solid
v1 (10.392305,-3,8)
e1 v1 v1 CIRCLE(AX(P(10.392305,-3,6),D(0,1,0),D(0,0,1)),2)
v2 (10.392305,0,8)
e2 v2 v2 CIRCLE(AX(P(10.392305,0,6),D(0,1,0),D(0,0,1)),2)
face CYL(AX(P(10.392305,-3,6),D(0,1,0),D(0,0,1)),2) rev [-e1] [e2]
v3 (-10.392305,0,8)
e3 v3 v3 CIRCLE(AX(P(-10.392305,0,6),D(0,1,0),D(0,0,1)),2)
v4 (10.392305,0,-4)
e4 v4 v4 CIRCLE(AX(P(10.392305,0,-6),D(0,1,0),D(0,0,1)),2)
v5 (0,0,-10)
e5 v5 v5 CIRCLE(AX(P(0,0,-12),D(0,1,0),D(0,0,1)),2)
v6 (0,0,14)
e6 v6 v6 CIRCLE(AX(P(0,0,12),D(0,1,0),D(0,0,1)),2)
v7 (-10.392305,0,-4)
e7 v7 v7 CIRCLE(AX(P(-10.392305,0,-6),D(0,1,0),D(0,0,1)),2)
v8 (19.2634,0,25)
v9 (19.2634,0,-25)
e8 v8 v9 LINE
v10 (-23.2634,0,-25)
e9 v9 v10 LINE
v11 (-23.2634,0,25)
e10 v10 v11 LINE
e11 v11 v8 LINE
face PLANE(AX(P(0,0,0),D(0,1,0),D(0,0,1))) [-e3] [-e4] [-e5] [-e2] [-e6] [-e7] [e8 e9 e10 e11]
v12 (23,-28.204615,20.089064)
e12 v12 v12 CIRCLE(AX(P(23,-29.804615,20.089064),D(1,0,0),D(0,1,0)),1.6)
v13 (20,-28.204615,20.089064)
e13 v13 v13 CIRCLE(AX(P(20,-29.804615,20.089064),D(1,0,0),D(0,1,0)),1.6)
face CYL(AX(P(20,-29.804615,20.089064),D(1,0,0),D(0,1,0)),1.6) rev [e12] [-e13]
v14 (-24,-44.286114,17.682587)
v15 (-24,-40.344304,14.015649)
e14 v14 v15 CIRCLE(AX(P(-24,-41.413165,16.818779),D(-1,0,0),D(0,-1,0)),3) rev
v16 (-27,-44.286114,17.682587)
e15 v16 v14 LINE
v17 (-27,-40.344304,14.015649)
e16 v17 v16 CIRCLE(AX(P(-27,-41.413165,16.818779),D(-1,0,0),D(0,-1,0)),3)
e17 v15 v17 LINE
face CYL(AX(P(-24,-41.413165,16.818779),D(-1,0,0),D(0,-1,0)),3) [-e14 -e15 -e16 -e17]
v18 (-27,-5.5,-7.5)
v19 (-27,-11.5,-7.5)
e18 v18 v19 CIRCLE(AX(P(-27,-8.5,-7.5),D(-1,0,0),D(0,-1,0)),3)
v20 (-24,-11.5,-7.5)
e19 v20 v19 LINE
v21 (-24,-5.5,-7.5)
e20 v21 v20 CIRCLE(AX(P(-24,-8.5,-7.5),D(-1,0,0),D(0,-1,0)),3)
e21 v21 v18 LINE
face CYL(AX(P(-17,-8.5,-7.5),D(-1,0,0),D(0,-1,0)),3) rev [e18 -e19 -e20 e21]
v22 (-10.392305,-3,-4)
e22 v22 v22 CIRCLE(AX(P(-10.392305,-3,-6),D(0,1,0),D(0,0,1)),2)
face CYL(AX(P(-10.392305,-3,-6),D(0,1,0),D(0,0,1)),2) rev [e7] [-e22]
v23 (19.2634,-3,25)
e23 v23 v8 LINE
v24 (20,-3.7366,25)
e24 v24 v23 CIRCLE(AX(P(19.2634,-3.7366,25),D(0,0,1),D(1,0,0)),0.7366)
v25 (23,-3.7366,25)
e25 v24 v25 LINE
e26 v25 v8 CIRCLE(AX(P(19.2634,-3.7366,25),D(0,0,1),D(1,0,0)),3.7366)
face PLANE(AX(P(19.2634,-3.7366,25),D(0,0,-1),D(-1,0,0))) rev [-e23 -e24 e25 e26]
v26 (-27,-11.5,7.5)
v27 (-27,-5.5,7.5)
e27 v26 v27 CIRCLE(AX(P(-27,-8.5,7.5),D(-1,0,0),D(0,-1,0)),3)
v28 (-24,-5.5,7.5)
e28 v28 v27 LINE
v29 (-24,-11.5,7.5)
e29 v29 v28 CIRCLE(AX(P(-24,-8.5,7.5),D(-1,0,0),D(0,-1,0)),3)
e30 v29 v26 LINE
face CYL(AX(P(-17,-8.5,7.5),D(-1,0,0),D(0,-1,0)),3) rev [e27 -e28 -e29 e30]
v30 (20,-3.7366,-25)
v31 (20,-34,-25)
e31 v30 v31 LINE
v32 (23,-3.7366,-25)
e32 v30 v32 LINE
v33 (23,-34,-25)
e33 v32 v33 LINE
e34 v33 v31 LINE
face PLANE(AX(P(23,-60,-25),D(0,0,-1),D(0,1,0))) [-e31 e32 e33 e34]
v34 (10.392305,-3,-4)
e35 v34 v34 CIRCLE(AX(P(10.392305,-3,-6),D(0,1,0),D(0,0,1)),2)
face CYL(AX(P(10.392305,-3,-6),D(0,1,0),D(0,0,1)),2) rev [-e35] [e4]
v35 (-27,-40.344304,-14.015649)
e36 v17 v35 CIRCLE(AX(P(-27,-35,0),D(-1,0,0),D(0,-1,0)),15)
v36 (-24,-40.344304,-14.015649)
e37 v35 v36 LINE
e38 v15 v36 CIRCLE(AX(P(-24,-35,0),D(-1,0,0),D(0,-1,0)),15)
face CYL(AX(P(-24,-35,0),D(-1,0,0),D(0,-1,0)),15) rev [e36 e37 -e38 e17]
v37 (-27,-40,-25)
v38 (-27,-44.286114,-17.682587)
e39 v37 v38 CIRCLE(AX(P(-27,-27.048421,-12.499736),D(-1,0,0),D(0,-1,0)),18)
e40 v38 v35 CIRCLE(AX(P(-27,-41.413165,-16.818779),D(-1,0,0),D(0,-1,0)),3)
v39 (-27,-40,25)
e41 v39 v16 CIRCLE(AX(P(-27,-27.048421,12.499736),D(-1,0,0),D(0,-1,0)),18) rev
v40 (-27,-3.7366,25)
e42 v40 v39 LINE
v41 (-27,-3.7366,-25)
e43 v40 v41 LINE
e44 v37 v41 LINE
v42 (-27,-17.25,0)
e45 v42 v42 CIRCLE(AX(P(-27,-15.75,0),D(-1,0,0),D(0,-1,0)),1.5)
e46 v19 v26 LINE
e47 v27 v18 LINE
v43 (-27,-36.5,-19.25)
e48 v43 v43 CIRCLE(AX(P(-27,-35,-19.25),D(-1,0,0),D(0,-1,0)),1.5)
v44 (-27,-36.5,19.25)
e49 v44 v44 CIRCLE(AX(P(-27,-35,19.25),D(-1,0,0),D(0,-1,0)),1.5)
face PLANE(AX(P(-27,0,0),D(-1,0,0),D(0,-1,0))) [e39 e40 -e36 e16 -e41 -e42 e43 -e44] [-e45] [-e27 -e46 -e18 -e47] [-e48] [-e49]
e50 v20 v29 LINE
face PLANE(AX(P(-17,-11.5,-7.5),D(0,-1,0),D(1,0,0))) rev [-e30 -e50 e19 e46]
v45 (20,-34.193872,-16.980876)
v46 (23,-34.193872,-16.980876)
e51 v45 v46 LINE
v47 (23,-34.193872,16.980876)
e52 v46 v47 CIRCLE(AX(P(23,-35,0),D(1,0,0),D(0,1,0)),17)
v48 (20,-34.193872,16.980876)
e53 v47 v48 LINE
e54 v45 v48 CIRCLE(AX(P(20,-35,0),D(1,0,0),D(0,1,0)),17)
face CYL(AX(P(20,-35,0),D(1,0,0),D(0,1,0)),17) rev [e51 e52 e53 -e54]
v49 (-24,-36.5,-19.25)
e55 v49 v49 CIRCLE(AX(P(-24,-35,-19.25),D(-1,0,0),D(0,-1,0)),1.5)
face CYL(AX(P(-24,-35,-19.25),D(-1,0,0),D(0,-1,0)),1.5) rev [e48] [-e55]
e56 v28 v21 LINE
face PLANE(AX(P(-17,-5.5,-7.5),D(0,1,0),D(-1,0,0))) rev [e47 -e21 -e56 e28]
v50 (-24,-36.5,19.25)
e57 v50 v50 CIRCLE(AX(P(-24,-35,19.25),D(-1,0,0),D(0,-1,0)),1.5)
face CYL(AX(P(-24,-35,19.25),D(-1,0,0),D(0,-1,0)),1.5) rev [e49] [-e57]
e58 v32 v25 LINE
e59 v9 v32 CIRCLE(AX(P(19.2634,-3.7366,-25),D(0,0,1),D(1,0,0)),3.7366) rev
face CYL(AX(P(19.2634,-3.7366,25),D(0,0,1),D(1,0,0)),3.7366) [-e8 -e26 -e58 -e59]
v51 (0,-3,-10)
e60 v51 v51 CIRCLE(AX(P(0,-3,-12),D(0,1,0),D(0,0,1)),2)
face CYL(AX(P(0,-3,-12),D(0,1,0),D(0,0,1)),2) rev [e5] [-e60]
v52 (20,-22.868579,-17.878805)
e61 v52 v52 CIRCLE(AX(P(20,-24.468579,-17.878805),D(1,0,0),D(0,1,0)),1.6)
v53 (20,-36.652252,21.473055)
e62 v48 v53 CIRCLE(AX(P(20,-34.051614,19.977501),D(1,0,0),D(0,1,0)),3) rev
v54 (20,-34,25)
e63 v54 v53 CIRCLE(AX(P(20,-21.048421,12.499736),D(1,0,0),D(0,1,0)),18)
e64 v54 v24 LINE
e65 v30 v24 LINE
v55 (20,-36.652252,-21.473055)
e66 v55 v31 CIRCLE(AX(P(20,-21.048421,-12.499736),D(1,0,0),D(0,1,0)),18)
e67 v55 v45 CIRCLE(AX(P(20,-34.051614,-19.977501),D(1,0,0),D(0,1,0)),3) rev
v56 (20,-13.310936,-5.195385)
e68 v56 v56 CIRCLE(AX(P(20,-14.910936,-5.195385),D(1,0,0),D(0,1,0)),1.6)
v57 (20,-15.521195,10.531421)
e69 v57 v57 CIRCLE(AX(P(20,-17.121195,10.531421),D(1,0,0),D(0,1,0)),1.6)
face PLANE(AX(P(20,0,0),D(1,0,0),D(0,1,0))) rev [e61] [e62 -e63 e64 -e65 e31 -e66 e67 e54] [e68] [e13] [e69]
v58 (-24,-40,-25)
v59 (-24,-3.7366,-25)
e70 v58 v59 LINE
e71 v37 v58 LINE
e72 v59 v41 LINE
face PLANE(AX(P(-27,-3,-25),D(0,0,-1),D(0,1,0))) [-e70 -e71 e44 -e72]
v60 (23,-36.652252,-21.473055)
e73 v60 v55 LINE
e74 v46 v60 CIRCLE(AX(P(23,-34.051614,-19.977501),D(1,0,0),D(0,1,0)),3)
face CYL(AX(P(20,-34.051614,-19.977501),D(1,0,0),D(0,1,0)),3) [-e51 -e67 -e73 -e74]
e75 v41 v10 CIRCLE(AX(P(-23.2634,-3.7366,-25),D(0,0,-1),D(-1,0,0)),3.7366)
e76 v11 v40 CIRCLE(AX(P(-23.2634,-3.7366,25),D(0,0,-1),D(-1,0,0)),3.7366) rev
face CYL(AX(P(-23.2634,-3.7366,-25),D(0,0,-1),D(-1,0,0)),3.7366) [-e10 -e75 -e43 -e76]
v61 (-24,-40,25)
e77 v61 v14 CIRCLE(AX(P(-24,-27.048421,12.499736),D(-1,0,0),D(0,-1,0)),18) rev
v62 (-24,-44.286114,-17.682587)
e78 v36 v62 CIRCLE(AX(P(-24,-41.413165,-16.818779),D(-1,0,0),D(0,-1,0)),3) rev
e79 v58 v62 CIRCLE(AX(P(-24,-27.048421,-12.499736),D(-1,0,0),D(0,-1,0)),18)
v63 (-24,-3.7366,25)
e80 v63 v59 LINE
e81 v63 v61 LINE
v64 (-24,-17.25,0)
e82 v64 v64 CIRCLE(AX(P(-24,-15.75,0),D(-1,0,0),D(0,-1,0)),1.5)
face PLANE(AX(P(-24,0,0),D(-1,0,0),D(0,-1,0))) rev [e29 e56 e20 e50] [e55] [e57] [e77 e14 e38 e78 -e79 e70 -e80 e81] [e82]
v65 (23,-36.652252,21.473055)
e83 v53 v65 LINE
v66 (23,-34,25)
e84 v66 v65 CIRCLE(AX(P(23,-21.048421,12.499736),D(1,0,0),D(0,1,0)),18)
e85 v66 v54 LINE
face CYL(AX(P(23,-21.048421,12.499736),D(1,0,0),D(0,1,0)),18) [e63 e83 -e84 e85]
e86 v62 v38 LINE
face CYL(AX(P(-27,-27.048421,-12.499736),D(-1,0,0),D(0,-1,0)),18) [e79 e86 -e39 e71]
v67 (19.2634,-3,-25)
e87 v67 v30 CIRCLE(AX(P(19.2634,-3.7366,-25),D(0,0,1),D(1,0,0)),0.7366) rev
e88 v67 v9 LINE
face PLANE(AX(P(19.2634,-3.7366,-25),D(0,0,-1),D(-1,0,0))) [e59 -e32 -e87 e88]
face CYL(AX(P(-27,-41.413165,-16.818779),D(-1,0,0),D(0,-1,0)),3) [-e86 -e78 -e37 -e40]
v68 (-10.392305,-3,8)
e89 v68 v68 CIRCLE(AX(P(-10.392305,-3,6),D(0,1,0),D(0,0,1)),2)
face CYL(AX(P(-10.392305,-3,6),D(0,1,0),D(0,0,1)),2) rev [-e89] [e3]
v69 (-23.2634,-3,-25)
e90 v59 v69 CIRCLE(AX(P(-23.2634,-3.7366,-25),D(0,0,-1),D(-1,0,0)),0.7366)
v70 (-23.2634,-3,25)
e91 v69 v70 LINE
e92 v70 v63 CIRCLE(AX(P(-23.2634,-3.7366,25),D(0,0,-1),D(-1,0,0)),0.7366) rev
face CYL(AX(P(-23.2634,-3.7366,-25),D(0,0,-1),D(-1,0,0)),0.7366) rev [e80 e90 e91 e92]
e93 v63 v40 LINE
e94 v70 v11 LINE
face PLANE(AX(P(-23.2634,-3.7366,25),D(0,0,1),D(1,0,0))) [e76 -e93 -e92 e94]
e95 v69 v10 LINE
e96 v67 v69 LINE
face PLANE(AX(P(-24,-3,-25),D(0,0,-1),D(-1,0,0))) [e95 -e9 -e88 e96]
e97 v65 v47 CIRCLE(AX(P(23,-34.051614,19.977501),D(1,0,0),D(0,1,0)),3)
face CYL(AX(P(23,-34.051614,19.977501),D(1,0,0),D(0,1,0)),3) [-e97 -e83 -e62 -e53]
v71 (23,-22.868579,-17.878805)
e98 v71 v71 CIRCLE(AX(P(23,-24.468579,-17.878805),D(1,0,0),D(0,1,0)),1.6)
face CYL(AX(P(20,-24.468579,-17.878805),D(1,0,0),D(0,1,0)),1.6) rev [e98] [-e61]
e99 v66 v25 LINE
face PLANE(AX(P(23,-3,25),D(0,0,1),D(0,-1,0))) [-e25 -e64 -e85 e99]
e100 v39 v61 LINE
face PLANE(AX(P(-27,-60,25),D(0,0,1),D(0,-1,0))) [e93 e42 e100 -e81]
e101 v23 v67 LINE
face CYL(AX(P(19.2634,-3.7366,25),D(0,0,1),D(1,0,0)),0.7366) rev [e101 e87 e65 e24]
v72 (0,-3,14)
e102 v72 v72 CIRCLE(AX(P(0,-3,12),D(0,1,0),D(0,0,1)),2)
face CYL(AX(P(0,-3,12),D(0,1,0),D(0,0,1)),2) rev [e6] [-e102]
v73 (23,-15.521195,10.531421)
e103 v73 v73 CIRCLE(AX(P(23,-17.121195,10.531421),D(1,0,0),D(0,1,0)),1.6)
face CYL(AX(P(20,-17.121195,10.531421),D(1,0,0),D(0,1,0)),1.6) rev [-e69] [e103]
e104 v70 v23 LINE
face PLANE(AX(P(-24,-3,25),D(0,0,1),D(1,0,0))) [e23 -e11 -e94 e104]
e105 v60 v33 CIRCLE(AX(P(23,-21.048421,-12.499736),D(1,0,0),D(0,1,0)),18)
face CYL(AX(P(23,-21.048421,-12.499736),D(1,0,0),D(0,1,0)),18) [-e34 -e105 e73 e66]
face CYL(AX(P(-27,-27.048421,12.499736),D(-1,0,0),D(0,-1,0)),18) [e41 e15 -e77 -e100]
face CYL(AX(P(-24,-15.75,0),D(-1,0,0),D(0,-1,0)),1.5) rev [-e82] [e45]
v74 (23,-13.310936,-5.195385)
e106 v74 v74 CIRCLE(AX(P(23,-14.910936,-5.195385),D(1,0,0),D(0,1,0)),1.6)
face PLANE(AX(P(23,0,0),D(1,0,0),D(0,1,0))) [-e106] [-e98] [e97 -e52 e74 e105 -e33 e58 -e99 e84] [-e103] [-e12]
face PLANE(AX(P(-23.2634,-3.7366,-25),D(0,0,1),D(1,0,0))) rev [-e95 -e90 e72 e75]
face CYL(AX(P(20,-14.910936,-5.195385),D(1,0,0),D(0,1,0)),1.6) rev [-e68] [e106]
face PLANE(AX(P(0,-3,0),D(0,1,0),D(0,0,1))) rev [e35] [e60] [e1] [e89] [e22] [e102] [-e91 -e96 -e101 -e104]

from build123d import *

# Parameters (mm, degrees)
SKETCH_1_W                       = 44
SKETCH_1_H                       = 50
SKETCH_1_R                       = 2
SM_BASE_FLANGE_1_DEPTH           = 3
SM_EDGE_FLANGE_1_STRIP_W         = 13.4732
SM_EDGE_FLANGE_1_STRIP_H         = 3
SM_EDGE_FLANGE_1_STRIP_CUT_DEPTH = 50
SM_EDGE_FLANGE_1_DEPTH           = 50
SM_EDGE_FLANGE_2_STRIP_W         = 13.4732
SM_EDGE_FLANGE_2_STRIP_H         = 3
SM_EDGE_FLANGE_2_STRIP_CUT_DEPTH = 50
SM_EDGE_FLANGE_2_DEPTH           = 50
SKETCH_15_R                      = 15
SKETCH_15_R_2                    = 1.5
CUT_EXTRUDE_1_DEPTH              = 3
SKETCH_16_R                      = 1.6
SKETCH_16_R_2                    = 17
CUT_EXTRUDE_2_DEPTH              = 3
CUT_EXTRUDE_5_DEPTH              = 3
SKETCH_18_R                      = 1.6
CUT_EXTRUDE_6_DEPTH              = 3
FILLET_2_R                       = 3
CUT_EXTRUDE_7_DEPTH              = 10


# Sheet-metal steps are written as plain solids
with BuildPart() as part:
    # Sketch 1 → 基体-法兰1 (new body)
    with BuildSketch(Plane(origin=(0, 0, 0), x_dir=(1, 0, 0), z_dir=(0, 1, 0))):
        with Locations((-2, 0)):
            Rectangle(SKETCH_1_W, SKETCH_1_H)
        with Locations(Location((0, 12, 0), (0, 0, 270))):
            Circle(SKETCH_1_R, mode=Mode.SUBTRACT)
        with Locations(Location((10.392304845, 6, 0), (0, 0, 270))):
            Circle(SKETCH_1_R, mode=Mode.SUBTRACT)
        with Locations(Location((10.392304845, -6, 0), (0, 0, 270))):
            Circle(SKETCH_1_R, mode=Mode.SUBTRACT)
        with Locations(Location((0, -12, 0), (0, 0, 270))):
            Circle(SKETCH_1_R, mode=Mode.SUBTRACT)
        with Locations(Location((-10.392304845, -6, 0), (0, 0, 270))):
            Circle(SKETCH_1_R, mode=Mode.SUBTRACT)
        with Locations(Location((-10.392304845, 6, 0), (0, 0, 270))):
            Circle(SKETCH_1_R, mode=Mode.SUBTRACT)
    extrude(amount=-SM_BASE_FLANGE_1_DEPTH)

    # 边线-法兰1 strip (across the edge) → 边线-法兰1 strip cut (cut)
    with BuildSketch(Plane(origin=(20, -3, -25), x_dir=(-1, 0, 0), z_dir=(0, 0, 1))):
        with Locations((-6, -1.5)):
            Rectangle(SM_EDGE_FLANGE_1_STRIP_W, SM_EDGE_FLANGE_1_STRIP_H)
    extrude(amount=SM_EDGE_FLANGE_1_STRIP_CUT_DEPTH, mode=Mode.SUBTRACT)

    # 边线-法兰1 section (across the edge) → 边线-法兰1 (add)
    with BuildSketch(Plane(origin=(20, -3, -25), x_dir=(-1, 0, 0), z_dir=(0, 0, 1))):
        with BuildLine():
            Line((-3, 0.7366), (-3, 57))
            Line((-3, 57), (0, 57))
            Line((0, 57), (0, 0.7366))
            ThreePointArc((0, 0.7366), (0.215745145, 0.215745145), (0.7366, 0))
            Line((0.7366, 0), (0.7366, -3))
            ThreePointArc((0.7366, -3), (-1.905575199, -1.905575199), (-3, 0.7366))
        make_face()
    extrude(amount=SM_EDGE_FLANGE_1_DEPTH)

    # 边线-法兰2 strip (across the edge) → 边线-法兰2 strip cut (cut)
    with BuildSketch(Plane(origin=(-24, -3, 25), x_dir=(1, 0, 0), z_dir=(0, 0, -1))):
        with Locations((-6, -1.5)):
            Rectangle(SM_EDGE_FLANGE_2_STRIP_W, SM_EDGE_FLANGE_2_STRIP_H)
    extrude(amount=SM_EDGE_FLANGE_2_STRIP_CUT_DEPTH, mode=Mode.SUBTRACT)

    # 边线-法兰2 section (across the edge) → 边线-法兰2 (add)
    with BuildSketch(Plane(origin=(-24, -3, 25), x_dir=(1, 0, 0), z_dir=(0, 0, -1))):
        with BuildLine():
            Line((-3, 0.7366), (-3, 57))
            Line((-3, 57), (0, 57))
            Line((0, 57), (0, 0.7366))
            ThreePointArc((0, 0.7366), (0.215745145, 0.215745145), (0.7366, 0))
            Line((0.7366, 0), (0.7366, -3))
            ThreePointArc((0.7366, -3), (-1.905575199, -1.905575199), (-3, 0.7366))
        make_face()
    extrude(amount=SM_EDGE_FLANGE_2_DEPTH)

    # 草图15 → 切除-拉伸1 (cut)
    with BuildSketch(Plane.ZY.offset(27)):
        with Locations(Location((0, -35, 0), (0, 0, 270))):
            Circle(SKETCH_15_R)
        with Locations(Location((0, -15.75, 0), (0, 0, 270))):
            Circle(SKETCH_15_R_2)
        with Locations(Location((19.25, -35, 0), (0, 0, 270))):
            Circle(SKETCH_15_R_2)
        with Locations(Location((0, -54.25, 0), (0, 0, 270))):
            Circle(SKETCH_15_R_2)
        with Locations(Location((-19.25, -35, 0), (0, 0, 270))):
            Circle(SKETCH_15_R_2)
    extrude(amount=-CUT_EXTRUDE_1_DEPTH, mode=Mode.SUBTRACT)

    # 草图16 → 切除-拉伸2 (cut)
    with BuildSketch(Plane(origin=(23, 0, 0), x_dir=(0, 0, -1), z_dir=(1, 0, 0))):
        with Locations(Location((17.878805079, -24.468578969, 0), (0, 0, 90))):
            Circle(SKETCH_16_R)
        with Locations(Location((20.089063538, -40.195385084, 0), (0, 0, 90))):
            Circle(SKETCH_16_R)
        with Locations(Location((10.531421031, -52.878805079, 0), (0, 0, 90))):
            Circle(SKETCH_16_R)
        with BuildLine():
            ThreePointArc((-3.595385084, -55.089063538), (-4.993466734, -53.501855618), (-6.744421309, -54.688455531))
            ThreePointArc((-6.744421309, -54.688455531), (-5.595993091, -56.638099762), (-3.64634886, -55.489671544))
            ThreePointArc((-3.64634886, -55.489671544), (-3.608177165, -55.290981888), (-3.595385084, -55.089063538))
        make_face()
        with Locations(Location((-17.878805079, -45.531421031, 0), (0, 0, 90))):
            Circle(SKETCH_16_R)
        with Locations(Location((-20.089063538, -29.804614916, 0), (0, 0, 90))):
            Circle(SKETCH_16_R)
        with Locations(Location((-10.531421031, -17.121194921, 0), (0, 0, 90))):
            Circle(SKETCH_16_R)
        with Locations(Location((5.195385084, -14.910936462, 0), (0, 0, 90))):
            Circle(SKETCH_16_R)
        with Locations(Location((0, -35, 0), (0, 0, 90))):
            Circle(SKETCH_16_R_2)
    extrude(amount=-CUT_EXTRUDE_2_DEPTH, mode=Mode.SUBTRACT)

    # 草图17 → 切除-拉伸5 (cut)
    with BuildSketch(Plane.ZY.offset(27)):
        with BuildLine():
            ThreePointArc((0, -50), (-6.123724357, -48.693063938), (-11.180339887, -45))
            ThreePointArc((-11.180339887, -45), (-18.623701364, -43.974644577), (-25, -40))
            Line((-25, -40), (-25, -60))
            Line((-25, -60), (0, -60))
            Line((0, -60), (0, -55.75))
            ThreePointArc((0, -55.75), (-1.5, -54.25), (0, -52.75))
            Line((0, -52.75), (0, -50))
        make_face()
        with BuildLine():
            Line((25, -60), (25, -40))
            ThreePointArc((25, -40), (18.623701364, -43.974644577), (11.180339887, -45))
            ThreePointArc((11.180339887, -45), (6.123724357, -48.693063938), (0, -50))
            Line((0, -50), (0, -52.75))
            ThreePointArc((0, -52.75), (1.060660172, -53.189339828), (1.5, -54.25))
            ThreePointArc((1.5, -54.25), (1.060660172, -55.310660172), (0, -55.75))
            Line((0, -55.75), (0, -60))
            Line((0, -60), (25, -60))
        make_face()
        with BuildLine():
            ThreePointArc((15, -35), (10.606601718, -24.393398282), (0, -20))
            Line((0, -20), (0, -45))
            Line((0, -45), (11.180339887, -45))
            ThreePointArc((11.180339887, -45), (14.012585384, -40.352331347), (15, -35))
        make_face()
        with BuildLine():
            Line((0, -45), (0, -20))
            ThreePointArc((0, -20), (-13.693063938, -28.876275643), (-11.180339887, -45))
            Line((-11.180339887, -45), (0, -45))
        make_face()
        with BuildLine():
            Line((11.180339887, -45), (0, -45))
            Line((0, -45), (0, -50))
            ThreePointArc((0, -50), (6.123724357, -48.693063938), (11.180339887, -45))
        make_face()
        with BuildLine():
            Line((0, -50), (0, -45))
            Line((0, -45), (-11.180339887, -45))
            ThreePointArc((-11.180339887, -45), (-6.123724357, -48.693063938), (0, -50))
        make_face()
    extrude(amount=-CUT_EXTRUDE_5_DEPTH, mode=Mode.SUBTRACT)

    # 草图18 → 切除-拉伸6 (cut)
    # profile 1 of 5: a face of its own
    with BuildSketch(Plane(origin=(23, 0, 0), x_dir=(0, 0, -1), z_dir=(1, 0, 0))):
        with BuildLine():
            ThreePointArc((13.743814378, -45.005376871), (0, -52), (-13.743814378, -45.005376871))
            ThreePointArc((-13.743814378, -45.005376871), (-15.17808001, -44.848040907), (-16.595135856, -44.576332908))
            ThreePointArc((-16.595135856, -44.576332908), (-16.359945185, -45.028365745), (-16.278805079, -45.531421031))
            ThreePointArc((-16.278805079, -45.531421031), (-18.786243203, -46.849205555), (-18.449500144, -44.036661137))
            ThreePointArc((-18.449500144, -44.036661137), (-21.942963359, -42.372436612), (-25, -40))
            Line((-25, -40), (-25, -60))
            Line((-25, -60), (25, -60))
            Line((25, -60), (25, -40))
            ThreePointArc((25, -40), (19.81343454, -43.495603445), (13.743814378, -45.005376871))
        make_face()
        with Locations((-5.195385084, -55.089063538)):
            Circle(SKETCH_18_R, mode=Mode.SUBTRACT)
        with Locations((10.531421031, -52.878805079)):
            Circle(SKETCH_18_R, mode=Mode.SUBTRACT)
    # profile 2 of 5: a face of its own
    with BuildSketch(Plane(origin=(23, 0, 0), x_dir=(0, 0, -1), z_dir=(1, 0, 0))):
        with BuildLine():
            Line((11.180339887, -45), (-11.180339887, -45))
            ThreePointArc((-11.180339887, -45), (-12.461981292, -45.048381264), (-13.743814378, -45.005376871))
            ThreePointArc((-13.743814378, -45.005376871), (0, -52), (13.743814378, -45.005376871))
            ThreePointArc((13.743814378, -45.005376871), (12.461981292, -45.048381264), (11.180339887, -45))
        make_face()
    # profile 3 of 5: a face of its own
    with BuildSketch(Plane(origin=(23, 0, 0), x_dir=(0, 0, -1), z_dir=(1, 0, 0))):
        with BuildLine():
            ThreePointArc((-16.595135856, -44.576332908), (-15.17808001, -44.848040907), (-13.743814378, -45.005376871))
            ThreePointArc((-13.743814378, -45.005376871), (-15.519532338, -41.938596112), (-16.620858499, -38.570302896))
            ThreePointArc((-16.620858499, -38.570302896), (-21.118873978, -36.850650515), (-25, -34))
            Line((-25, -34), (-25, -40))
            ThreePointArc((-25, -40), (-21.942963359, -42.372436612), (-18.449500144, -44.036661137))
            ThreePointArc((-18.449500144, -44.036661137), (-17.431709516, -43.995157526), (-16.595135856, -44.576332908))
        make_face()
    # profile 4 of 5: a face of its own
    with BuildSketch(Plane(origin=(23, 0, 0), x_dir=(0, 0, -1), z_dir=(1, 0, 0))):
        with BuildLine():
            ThreePointArc((-13.743814378, -45.005376871), (-12.461981292, -45.048381264), (-11.180339887, -45))
            Line((-11.180339887, -45), (11.180339887, -45))
            ThreePointArc((11.180339887, -45), (12.461981292, -45.048381264), (13.743814378, -45.005376871))
            ThreePointArc((13.743814378, -45.005376871), (15.519532338, -41.938596112), (16.620858499, -38.570302896))
            ThreePointArc((16.620858499, -38.570302896), (13.916978953, -38.992540305), (11.180339887, -39))
            Line((11.180339887, -39), (-11.180339887, -39))
            ThreePointArc((-11.180339887, -39), (-13.916978953, -38.992540305), (-16.620858499, -38.570302896))
            ThreePointArc((-16.620858499, -38.570302896), (-15.519532338, -41.938596112), (-13.743814378, -45.005376871))
        make_face()
    # profile 5 of 5: a face of its own
    with BuildSketch(Plane(origin=(23, 0, 0), x_dir=(0, 0, -1), z_dir=(1, 0, 0))):
        with BuildLine():
            ThreePointArc((16.620858499, -38.570302896), (15.519532338, -41.938596112), (13.743814378, -45.005376871))
            ThreePointArc((13.743814378, -45.005376871), (19.81343454, -43.495603445), (25, -40))
            Line((25, -40), (25, -34))
            ThreePointArc((25, -34), (21.118873978, -36.850650515), (16.620858499, -38.570302896))
        make_face()
        with Locations((20.089063538, -40.195385084)):
            Circle(SKETCH_18_R, mode=Mode.SUBTRACT)
    extrude(amount=-CUT_EXTRUDE_6_DEPTH, mode=Mode.SUBTRACT)

    # 圆角2
    fillet_2_edges = [part.edges().sort_by_distance(p)[0] for p in [
        (-25.5, -45, 11.180339887),
        (-25.5, -45, -11.180339887),
        (21.5, -38.570302896, -16.620858499),
        (21.5, -38.570302896, 16.620858499),
    ]]
    fillet(fillet_2_edges, radius=FILLET_2_R)

    # 草图19 → 切除-拉伸7 (cut)
    with BuildSketch(Plane.ZY.offset(27)):
        with BuildLine():
            Line((-7.5, -5.5), (7.5, -5.5))
            ThreePointArc((7.5, -5.5), (10.5, -8.5), (7.5, -11.5))
            Line((7.5, -11.5), (-7.5, -11.5))
            ThreePointArc((-7.5, -11.5), (-10.5, -8.5), (-7.5, -5.5))
        make_face()
    extrude(amount=-CUT_EXTRUDE_7_DEPTH, mode=Mode.SUBTRACT)


solid = part.part
